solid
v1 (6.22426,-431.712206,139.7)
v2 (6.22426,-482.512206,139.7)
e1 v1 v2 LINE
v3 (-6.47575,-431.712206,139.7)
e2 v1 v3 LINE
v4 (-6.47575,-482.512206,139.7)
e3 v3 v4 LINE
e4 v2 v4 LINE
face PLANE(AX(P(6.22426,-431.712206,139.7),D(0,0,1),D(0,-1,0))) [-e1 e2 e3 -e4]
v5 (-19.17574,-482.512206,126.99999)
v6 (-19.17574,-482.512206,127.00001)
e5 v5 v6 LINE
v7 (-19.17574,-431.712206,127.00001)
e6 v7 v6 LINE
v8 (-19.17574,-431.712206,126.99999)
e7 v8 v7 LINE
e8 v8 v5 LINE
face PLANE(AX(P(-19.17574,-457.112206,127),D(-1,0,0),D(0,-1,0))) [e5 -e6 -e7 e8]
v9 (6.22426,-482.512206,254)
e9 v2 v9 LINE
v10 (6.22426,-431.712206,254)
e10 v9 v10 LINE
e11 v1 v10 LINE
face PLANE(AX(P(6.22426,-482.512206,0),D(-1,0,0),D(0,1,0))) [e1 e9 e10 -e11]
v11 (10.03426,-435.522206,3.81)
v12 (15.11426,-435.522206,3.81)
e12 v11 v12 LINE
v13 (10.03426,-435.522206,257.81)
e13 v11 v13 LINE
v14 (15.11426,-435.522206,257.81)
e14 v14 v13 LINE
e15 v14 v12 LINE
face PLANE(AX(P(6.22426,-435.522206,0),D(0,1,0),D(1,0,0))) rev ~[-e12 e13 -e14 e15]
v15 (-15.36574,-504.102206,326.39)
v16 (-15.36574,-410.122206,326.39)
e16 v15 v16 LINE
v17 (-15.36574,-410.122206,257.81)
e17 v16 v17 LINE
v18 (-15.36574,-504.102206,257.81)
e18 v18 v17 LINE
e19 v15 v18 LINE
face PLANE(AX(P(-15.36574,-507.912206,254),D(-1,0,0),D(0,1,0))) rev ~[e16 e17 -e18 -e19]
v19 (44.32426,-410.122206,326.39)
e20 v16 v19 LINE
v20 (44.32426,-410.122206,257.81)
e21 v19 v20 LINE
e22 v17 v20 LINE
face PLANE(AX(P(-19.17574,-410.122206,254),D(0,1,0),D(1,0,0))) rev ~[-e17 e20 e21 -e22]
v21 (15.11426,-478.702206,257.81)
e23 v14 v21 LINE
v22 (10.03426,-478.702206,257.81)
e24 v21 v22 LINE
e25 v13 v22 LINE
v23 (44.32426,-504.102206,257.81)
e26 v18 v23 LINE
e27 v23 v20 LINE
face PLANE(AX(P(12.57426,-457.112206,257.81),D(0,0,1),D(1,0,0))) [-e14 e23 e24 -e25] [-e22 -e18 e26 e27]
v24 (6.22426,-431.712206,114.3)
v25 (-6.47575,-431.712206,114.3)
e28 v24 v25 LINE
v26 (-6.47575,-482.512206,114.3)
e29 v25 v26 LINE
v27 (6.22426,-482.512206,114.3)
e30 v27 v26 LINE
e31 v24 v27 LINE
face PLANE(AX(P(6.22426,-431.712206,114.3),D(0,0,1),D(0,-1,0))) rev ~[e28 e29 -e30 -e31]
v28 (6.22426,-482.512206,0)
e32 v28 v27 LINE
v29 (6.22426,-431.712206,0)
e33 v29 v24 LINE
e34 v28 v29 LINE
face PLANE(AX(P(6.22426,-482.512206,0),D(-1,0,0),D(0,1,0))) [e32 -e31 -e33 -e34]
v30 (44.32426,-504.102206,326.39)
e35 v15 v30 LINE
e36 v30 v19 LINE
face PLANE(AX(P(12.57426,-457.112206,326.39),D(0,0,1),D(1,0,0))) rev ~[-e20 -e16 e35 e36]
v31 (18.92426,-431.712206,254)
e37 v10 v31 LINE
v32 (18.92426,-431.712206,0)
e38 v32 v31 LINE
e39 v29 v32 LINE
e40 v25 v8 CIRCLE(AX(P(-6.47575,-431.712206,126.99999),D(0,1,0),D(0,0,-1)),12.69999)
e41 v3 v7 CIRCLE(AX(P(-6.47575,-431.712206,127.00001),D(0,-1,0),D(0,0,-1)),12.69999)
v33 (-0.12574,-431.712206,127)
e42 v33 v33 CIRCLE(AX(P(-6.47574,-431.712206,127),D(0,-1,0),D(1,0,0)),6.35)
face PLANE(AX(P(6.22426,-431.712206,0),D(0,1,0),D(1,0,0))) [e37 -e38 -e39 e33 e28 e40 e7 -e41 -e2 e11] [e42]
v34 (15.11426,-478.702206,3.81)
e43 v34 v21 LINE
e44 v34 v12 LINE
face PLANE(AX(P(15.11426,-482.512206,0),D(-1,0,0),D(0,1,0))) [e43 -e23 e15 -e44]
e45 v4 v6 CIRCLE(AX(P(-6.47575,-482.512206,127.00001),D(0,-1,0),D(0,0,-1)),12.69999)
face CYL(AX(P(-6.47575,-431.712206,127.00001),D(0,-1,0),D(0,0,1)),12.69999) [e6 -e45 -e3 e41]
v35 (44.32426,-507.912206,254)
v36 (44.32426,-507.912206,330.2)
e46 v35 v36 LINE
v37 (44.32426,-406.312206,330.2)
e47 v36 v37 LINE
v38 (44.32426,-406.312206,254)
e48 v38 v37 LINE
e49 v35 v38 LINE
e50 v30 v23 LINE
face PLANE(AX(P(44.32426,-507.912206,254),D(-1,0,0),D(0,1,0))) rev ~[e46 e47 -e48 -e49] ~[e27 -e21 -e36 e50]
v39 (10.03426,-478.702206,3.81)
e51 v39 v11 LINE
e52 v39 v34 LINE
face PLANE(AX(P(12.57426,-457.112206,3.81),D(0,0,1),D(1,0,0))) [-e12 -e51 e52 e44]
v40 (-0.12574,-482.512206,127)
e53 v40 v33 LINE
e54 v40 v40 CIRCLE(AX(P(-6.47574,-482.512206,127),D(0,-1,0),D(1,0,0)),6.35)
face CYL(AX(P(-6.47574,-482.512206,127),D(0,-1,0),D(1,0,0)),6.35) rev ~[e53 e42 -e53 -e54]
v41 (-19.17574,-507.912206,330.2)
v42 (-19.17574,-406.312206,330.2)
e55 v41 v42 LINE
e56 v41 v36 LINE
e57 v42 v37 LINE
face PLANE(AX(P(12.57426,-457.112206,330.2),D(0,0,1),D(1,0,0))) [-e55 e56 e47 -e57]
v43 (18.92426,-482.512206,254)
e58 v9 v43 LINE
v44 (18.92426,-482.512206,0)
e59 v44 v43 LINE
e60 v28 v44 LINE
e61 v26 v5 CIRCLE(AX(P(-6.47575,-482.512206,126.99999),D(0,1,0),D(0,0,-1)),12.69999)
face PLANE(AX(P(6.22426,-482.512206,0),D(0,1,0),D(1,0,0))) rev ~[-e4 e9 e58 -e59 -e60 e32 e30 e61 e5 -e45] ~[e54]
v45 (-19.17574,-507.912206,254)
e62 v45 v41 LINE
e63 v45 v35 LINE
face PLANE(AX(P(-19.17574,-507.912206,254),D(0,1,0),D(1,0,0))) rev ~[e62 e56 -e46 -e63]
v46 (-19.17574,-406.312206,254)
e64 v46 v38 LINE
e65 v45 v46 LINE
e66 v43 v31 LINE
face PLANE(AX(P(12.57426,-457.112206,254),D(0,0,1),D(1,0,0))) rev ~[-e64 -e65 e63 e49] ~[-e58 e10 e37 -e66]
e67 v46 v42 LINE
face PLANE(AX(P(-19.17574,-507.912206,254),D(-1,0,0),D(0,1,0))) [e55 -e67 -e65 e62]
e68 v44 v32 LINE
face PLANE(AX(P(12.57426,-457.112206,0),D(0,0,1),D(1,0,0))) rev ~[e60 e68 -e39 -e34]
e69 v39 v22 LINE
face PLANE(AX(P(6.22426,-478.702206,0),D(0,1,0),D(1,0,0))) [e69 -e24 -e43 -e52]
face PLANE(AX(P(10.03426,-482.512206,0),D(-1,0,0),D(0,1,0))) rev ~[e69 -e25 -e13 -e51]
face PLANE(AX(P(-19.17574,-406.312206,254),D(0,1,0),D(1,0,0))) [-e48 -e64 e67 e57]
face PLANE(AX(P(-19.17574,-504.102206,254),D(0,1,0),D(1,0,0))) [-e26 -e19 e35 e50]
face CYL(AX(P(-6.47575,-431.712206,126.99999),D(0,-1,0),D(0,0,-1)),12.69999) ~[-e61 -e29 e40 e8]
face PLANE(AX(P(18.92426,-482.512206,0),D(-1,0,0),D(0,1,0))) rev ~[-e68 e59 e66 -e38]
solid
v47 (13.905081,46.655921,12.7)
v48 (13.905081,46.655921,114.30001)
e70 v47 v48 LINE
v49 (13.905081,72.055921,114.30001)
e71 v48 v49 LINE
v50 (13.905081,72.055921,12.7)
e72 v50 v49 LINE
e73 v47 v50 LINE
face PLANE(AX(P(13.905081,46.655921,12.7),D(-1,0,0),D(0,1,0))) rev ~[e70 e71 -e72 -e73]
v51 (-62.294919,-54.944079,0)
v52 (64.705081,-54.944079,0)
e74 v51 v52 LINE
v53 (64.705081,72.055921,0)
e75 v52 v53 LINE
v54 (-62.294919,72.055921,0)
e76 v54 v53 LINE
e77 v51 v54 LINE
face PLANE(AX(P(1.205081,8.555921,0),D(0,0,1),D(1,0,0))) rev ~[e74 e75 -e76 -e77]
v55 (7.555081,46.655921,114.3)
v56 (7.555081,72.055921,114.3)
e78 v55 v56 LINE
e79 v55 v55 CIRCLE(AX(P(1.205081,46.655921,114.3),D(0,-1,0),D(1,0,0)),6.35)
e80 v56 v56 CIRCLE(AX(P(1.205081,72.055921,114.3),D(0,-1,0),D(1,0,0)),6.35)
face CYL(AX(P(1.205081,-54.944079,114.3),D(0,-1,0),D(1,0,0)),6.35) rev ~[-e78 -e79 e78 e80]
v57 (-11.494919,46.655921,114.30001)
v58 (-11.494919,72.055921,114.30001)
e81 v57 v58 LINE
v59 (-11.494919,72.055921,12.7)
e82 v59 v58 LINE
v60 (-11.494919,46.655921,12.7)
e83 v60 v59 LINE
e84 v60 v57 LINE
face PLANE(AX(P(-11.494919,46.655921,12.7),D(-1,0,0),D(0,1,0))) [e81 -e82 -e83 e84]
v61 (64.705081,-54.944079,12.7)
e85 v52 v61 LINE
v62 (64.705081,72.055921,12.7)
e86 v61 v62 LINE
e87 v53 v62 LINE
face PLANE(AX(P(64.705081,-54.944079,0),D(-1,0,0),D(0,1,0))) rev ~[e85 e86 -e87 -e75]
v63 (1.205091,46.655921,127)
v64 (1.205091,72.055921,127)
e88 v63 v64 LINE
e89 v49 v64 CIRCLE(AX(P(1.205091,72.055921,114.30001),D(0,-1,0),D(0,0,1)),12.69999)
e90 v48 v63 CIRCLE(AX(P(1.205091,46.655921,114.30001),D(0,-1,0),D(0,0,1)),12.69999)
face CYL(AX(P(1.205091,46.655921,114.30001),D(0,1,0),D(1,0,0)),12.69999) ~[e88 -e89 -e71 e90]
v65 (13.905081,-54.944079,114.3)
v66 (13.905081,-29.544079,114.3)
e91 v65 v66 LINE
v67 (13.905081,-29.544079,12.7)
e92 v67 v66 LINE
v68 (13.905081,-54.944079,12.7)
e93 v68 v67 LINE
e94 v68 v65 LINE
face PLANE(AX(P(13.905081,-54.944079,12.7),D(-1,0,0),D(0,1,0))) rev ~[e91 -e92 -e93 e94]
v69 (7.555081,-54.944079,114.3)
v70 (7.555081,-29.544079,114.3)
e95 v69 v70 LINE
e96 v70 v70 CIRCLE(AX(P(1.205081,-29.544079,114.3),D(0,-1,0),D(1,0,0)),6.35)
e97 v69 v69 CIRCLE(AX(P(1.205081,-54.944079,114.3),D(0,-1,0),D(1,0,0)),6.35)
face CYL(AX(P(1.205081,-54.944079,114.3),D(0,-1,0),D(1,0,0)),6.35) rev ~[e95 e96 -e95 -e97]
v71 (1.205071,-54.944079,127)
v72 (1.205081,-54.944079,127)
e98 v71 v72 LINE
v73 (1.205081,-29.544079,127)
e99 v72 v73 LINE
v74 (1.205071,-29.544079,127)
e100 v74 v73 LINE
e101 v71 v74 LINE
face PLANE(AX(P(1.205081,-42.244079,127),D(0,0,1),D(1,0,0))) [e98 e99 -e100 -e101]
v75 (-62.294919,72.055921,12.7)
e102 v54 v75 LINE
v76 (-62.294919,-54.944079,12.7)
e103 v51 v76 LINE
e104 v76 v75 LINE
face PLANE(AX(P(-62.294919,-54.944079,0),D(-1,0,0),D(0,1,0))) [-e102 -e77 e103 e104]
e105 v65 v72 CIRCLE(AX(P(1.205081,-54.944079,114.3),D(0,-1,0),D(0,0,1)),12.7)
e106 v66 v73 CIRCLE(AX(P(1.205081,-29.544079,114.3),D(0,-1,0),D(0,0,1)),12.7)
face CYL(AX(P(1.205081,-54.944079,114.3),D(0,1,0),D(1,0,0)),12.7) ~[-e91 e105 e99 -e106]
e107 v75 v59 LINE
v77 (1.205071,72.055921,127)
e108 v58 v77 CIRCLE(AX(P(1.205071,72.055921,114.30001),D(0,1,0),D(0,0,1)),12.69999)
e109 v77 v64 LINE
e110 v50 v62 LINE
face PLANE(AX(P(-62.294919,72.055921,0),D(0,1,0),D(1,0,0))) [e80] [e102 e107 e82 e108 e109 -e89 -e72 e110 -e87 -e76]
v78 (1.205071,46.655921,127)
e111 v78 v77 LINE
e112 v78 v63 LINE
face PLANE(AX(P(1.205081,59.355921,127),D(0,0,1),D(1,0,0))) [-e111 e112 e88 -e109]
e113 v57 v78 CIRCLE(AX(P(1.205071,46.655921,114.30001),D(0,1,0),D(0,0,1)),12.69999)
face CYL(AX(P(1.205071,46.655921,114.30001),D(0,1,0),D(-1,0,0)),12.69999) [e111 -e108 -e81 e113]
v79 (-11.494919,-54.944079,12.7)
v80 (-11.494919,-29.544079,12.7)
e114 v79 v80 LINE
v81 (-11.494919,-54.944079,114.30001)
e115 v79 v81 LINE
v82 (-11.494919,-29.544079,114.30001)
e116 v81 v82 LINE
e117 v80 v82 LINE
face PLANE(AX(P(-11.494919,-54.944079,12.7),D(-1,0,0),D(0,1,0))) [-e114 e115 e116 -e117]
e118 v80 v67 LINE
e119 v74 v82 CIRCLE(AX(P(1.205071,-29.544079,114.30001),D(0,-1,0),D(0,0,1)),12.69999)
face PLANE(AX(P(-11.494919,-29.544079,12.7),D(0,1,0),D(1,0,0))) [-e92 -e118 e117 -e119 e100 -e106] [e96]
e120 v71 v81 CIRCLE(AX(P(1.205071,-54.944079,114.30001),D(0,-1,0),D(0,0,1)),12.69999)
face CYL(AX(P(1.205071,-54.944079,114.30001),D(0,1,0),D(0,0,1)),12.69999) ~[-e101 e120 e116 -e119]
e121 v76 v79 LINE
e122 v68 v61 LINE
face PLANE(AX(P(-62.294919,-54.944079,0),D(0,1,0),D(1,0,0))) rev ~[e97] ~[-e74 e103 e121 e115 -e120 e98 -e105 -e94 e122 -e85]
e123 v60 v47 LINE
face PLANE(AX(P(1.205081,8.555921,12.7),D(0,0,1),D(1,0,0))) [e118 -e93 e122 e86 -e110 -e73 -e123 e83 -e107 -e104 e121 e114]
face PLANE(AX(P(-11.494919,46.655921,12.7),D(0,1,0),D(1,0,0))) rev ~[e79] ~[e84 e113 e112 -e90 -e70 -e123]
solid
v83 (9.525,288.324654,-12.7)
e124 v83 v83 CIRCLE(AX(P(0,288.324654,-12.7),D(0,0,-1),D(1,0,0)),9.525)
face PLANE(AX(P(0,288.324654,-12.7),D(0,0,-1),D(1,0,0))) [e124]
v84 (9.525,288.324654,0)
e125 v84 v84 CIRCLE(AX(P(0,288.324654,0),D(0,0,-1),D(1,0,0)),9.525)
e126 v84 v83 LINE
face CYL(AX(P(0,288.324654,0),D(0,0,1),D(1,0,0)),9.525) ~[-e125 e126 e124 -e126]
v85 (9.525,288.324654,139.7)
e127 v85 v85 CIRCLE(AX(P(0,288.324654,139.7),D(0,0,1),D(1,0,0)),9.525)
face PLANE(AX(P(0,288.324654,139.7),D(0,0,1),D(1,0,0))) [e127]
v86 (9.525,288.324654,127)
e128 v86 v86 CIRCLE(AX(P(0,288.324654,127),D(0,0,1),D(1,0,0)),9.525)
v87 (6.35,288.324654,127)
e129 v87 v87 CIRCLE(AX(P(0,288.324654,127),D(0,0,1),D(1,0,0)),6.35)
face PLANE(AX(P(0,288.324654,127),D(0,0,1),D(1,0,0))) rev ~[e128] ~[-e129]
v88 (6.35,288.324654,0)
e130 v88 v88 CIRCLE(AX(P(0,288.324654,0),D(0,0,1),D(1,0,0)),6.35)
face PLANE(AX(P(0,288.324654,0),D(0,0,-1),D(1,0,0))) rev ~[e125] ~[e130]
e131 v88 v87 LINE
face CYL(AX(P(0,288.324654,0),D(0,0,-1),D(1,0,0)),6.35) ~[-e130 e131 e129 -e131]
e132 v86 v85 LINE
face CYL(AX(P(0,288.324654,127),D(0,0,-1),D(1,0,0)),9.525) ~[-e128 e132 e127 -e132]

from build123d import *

# Parameters (mm, degrees)
F0_W      = 127
F0_H      = 127
F1_DEPTH  = 12.7
F2_W      = 25.4
F2_H      = 25.4
F3_DEPTH  = 114.3
F4_R      = 12.7
F5_R      = 12.69999
F6_R      = 12.69999
F7_R      = 6.35
F8_DEPTH  = 153.416
F0_R      = 6.35
F9_DEPTH  = 127
F10_R     = 9.525
F11_DEPTH = 12.7
F12_R     = 9.525
F13_DEPTH = 12.7
F0_W_2    = 12.7
F0_H_2    = 50.8
F14_DEPTH = 254
F15_W     = 63.5
F15_H     = 101.6
F15_W_2   = 12.7
F15_H_2   = 50.8
F16_DEPTH = 76.2
F17_T     = -3.81
F18_W     = 50.8
F18_H     = 25.4
F19_DEPTH = 25.4
F20_R     = 12.69999
F21_R     = 6.35
F22_DEPTH = 80.01


# Not quite as in the source:
# - a fillet or chamfer is up to 0.001 mm smaller than in the source, because OpenCascade refuses the exact size


with BuildPart() as f1:
    # F0 (on Top) → F1 (new body)
    with BuildSketch(Plane.XY):
        with Locations((1.2050811201, 8.5559213668)):
            Rectangle(F0_W, F0_H)
    extrude(amount=F1_DEPTH)

    # F2 (on face) → F3 (join)
    with BuildSketch(Plane.XY.offset(12.7)):
        with Locations((1.2050811201, -42.2440786332)):
            Rectangle(F2_W, F2_H)
        with Locations((1.2050811201, 59.3559213668)):
            Rectangle(F2_W, F2_H)
    extrude(amount=F3_DEPTH)

    # F4
    f4_edges = [f1.edges().sort_by_distance(p)[0] for p in [
        (13.905081, -42.244079, 127),
    ]]
    fillet(f4_edges, radius=F4_R)

    # F5 (radius 12.7 in the source; OpenCascade refuses exactly that, so slightly less here)
    f5_edges = [f1.edges().sort_by_distance(p)[0] for p in [
        (-11.494919, -42.244079, 127),
    ]]
    fillet(f5_edges, radius=F5_R)

    # F6 (radius 12.7 in the source; OpenCascade refuses exactly that, so slightly less here)
    f6_edges = [f1.edges().sort_by_distance(p)[0] for p in [
        (-11.494919, 59.355921, 127),
        (13.905081, 59.355921, 127),
    ]]
    fillet(f6_edges, radius=F6_R)

    # F7 (on face) → F8 (cut)
    with BuildSketch(Plane.XZ.offset(54.9440786332)):
        with Locations((1.2050811201, 114.3)):
            Circle(F7_R)
    extrude(amount=-F8_DEPTH, mode=Mode.SUBTRACT)


with BuildPart() as f9:
    # F0 (on Top) → F9 (new body)
    with BuildSketch(Plane.XY):
        with Locations((0, 288.3246541023)):
            Circle(F0_R)
    extrude(amount=F9_DEPTH)

    # F10 (on face) → F11 (join)
    with BuildSketch(Plane.XY.offset(127)):
        with Locations((0, 288.3246541023)):
            Circle(F10_R)
    extrude(amount=F11_DEPTH)

    # F12 (on face) → F13 (join)
    with BuildSketch(Plane(origin=(0, 0, 0), x_dir=(1, 0, 0), z_dir=(0, 0, -1))):
        with Locations((0, -288.3246541023)):
            Circle(F12_R)
    extrude(amount=F13_DEPTH)


with BuildPart() as f14:
    # F0 (on Top) → F14 (new body)
    with BuildSketch(Plane.XY):
        with Locations((12.5742597342, -457.1122058392)):
            Rectangle(F0_W_2, F0_H_2)
    extrude(amount=F14_DEPTH)

    # F15 (on face) → F16 (join)
    with BuildSketch(Plane.XY.offset(254)):
        with Locations((12.5742597342, -457.1122058392)):
            Rectangle(F15_W, F15_H)
        with Locations((12.5742597342, -457.1122058392)):
            Rectangle(F15_W_2, F15_H_2, mode=Mode.SUBTRACT)
        with Locations((12.5742597342, -457.1122058392)):
            Rectangle(F15_W_2, F15_H_2)
    extrude(amount=F16_DEPTH)

    # F17
    f17_openings = [f14.faces().sort_by_distance(p)[0] for p in [
        (44.32426, -457.112206, 292.1),
    ]]
    offset(amount=F17_T, openings=f17_openings, kind=Kind.INTERSECTION)

    # F18 (on face) → F19 (join)
    with BuildSketch(Plane(origin=(6.2242597342, 0, 0), x_dir=(0, -1, 0), z_dir=(-1, 0, 0))):
        with Locations((457.1122058392, 127)):
            Rectangle(F18_W, F18_H)
    extrude(amount=F19_DEPTH)

    # F20 (radius 12.7 in the source; OpenCascade refuses exactly that, so slightly less here)
    f20_edges = [f14.edges().sort_by_distance(p)[0] for p in [
        (-19.17574, -457.112206, 114.3),
        (-19.17574, -457.112206, 139.7),
    ]]
    fillet(f20_edges, radius=F20_R)

    # F21 (on face) → F22 (cut)
    with BuildSketch(Plane.XZ.offset(482.5122058392)):
        with Locations((-6.4757402658, 127)):
            Circle(F21_R)
    extrude(amount=-F22_DEPTH, mode=Mode.SUBTRACT)


solid = Compound([f1.part, f9.part, f14.part])
